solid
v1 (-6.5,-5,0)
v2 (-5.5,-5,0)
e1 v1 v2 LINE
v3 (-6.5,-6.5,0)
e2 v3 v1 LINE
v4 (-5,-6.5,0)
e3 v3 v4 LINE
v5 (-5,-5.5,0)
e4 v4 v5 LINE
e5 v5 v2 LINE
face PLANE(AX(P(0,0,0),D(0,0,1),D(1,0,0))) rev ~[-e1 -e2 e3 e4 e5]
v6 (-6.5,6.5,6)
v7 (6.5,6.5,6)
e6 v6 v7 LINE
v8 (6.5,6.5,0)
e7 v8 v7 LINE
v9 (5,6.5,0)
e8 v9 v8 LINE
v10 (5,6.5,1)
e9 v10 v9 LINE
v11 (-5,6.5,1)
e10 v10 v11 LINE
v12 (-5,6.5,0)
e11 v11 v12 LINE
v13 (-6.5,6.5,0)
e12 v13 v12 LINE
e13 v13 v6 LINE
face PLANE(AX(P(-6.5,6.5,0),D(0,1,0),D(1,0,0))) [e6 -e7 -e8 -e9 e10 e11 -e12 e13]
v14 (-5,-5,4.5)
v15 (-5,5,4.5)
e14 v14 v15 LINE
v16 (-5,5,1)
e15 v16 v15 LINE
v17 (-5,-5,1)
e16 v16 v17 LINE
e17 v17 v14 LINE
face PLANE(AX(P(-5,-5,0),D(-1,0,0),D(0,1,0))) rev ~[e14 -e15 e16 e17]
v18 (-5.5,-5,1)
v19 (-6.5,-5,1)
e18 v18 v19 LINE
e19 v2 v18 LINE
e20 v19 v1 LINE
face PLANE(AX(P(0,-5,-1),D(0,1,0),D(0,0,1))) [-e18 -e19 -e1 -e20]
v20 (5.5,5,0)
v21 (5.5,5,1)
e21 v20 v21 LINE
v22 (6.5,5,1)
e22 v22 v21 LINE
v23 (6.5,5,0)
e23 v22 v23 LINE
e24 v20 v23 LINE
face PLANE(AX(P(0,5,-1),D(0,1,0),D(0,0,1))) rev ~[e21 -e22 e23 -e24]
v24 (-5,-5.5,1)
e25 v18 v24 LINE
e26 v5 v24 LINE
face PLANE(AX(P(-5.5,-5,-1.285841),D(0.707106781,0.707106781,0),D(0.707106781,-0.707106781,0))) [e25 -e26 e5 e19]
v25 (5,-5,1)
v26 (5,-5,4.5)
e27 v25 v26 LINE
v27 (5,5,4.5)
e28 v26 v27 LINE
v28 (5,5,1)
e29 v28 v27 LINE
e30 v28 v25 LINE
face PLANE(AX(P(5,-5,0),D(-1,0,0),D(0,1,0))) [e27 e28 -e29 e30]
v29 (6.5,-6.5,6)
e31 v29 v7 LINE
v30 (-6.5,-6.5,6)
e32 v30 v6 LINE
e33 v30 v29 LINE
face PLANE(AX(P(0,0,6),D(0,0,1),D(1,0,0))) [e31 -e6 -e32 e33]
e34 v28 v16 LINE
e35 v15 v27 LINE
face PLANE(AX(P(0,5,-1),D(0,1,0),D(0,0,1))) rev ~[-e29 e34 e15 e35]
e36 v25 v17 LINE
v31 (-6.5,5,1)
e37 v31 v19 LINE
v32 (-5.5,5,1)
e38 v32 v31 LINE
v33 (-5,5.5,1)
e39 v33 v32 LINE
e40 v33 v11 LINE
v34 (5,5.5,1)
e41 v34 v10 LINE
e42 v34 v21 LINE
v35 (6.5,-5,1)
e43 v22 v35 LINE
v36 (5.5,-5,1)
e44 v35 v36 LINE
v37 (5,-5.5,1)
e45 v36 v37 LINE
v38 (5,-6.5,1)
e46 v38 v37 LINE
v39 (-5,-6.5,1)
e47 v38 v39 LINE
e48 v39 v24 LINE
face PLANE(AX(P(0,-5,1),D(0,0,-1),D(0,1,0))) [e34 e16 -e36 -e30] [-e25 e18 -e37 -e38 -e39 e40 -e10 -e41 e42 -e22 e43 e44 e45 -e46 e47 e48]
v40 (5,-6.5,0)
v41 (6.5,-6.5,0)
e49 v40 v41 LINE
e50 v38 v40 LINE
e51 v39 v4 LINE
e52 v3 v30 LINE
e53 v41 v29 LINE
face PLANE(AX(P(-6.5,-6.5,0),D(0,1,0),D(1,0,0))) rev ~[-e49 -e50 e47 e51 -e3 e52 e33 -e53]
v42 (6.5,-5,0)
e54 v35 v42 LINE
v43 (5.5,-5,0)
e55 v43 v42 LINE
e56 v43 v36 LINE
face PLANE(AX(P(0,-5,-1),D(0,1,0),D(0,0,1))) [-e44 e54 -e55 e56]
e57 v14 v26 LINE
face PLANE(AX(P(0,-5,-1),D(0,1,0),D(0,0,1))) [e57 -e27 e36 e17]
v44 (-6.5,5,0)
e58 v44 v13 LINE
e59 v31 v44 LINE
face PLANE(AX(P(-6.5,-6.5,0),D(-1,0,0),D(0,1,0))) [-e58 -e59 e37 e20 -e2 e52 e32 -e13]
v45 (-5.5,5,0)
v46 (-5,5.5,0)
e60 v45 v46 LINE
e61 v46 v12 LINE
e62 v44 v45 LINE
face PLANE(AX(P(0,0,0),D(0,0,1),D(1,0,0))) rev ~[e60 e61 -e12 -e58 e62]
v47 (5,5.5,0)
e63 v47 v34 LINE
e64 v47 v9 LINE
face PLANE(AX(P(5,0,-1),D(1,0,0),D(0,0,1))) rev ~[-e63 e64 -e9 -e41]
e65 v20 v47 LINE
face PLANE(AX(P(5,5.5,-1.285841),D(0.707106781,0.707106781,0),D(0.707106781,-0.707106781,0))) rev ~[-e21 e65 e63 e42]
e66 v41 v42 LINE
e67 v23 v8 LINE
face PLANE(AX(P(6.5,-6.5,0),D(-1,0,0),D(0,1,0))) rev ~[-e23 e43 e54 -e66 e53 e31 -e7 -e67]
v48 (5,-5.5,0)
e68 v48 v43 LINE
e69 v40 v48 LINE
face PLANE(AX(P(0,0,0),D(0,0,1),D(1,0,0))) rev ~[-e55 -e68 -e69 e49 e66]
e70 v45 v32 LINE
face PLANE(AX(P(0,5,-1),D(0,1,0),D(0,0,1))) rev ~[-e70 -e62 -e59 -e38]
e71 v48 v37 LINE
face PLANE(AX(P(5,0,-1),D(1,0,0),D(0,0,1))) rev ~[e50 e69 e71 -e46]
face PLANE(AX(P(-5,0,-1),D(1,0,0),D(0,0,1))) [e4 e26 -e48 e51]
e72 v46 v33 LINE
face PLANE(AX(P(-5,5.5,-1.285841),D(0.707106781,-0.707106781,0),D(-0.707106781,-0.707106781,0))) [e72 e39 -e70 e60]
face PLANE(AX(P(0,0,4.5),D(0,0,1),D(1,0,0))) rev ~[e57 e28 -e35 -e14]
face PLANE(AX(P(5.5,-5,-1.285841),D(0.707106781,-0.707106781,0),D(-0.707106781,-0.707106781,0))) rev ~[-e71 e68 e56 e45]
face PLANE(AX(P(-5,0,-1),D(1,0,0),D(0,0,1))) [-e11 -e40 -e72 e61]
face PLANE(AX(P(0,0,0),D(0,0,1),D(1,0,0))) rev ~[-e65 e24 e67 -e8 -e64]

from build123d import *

# Parameters (mm, degrees)
F0_W        = 13
F0_H        = 13
F1_DEPTH    = 6
F2_W        = 10
F2_H        = 10
F3_DEPTH    = 4.5
F4_W        = 10
F4_H        = 2
F5_DEPTH    = 12.5
F6_W        = 10
F6_H        = 2
F7_DEPTH    = 12.5
F8_T1_DEPTH = 2.285841494


# Not quite as in the source:
# - a fillet or chamfer that OpenCascade refuses, or shapes differently, is made with other operations: its cross-section is extruded or revolved along the edge and cut away or added


with BuildPart() as f1:
    # F0 (on Top) → F1 (new body)
    with BuildSketch(Plane.XY):
        Rectangle(F0_W, F0_H)
    extrude(amount=F1_DEPTH)

    # F2 (on Top) → F3 (cut)
    with BuildSketch(Plane.XY):
        Rectangle(F2_W, F2_H)
    extrude(amount=F3_DEPTH, mode=Mode.SUBTRACT)

    # F4 (on Right) → F5 (cut, symmetric)
    with BuildSketch(Plane.YZ):
        Rectangle(F4_W, F4_H)
    extrude(amount=F5_DEPTH, both=True, mode=Mode.SUBTRACT)

    # F6 (on Front) → F7 (cut, symmetric)
    with BuildSketch(Plane.XZ):
        Rectangle(F6_W, F6_H)
    extrude(amount=F7_DEPTH, both=True, mode=Mode.SUBTRACT)

    # F8: chamfer of 0.5 on 4 edges, made by hand

    # F8_s2 → F8_t1 (cut)
    with BuildSketch(Plane.XY.offset(-1.285841494)):
        Polygon((5.5, -5), (5, -5.5), (5, -5), align=None)
        Polygon((5, 5.5), (5.5, 5), (5, 5), align=None)
        Polygon((-5.5, -5), (-5, -5.5), (-5, -5), align=None)
        Polygon((-5, 5.5), (-5.5, 5), (-5, 5), align=None)
    extrude(amount=F8_T1_DEPTH, mode=Mode.SUBTRACT)


solid = f1.part
